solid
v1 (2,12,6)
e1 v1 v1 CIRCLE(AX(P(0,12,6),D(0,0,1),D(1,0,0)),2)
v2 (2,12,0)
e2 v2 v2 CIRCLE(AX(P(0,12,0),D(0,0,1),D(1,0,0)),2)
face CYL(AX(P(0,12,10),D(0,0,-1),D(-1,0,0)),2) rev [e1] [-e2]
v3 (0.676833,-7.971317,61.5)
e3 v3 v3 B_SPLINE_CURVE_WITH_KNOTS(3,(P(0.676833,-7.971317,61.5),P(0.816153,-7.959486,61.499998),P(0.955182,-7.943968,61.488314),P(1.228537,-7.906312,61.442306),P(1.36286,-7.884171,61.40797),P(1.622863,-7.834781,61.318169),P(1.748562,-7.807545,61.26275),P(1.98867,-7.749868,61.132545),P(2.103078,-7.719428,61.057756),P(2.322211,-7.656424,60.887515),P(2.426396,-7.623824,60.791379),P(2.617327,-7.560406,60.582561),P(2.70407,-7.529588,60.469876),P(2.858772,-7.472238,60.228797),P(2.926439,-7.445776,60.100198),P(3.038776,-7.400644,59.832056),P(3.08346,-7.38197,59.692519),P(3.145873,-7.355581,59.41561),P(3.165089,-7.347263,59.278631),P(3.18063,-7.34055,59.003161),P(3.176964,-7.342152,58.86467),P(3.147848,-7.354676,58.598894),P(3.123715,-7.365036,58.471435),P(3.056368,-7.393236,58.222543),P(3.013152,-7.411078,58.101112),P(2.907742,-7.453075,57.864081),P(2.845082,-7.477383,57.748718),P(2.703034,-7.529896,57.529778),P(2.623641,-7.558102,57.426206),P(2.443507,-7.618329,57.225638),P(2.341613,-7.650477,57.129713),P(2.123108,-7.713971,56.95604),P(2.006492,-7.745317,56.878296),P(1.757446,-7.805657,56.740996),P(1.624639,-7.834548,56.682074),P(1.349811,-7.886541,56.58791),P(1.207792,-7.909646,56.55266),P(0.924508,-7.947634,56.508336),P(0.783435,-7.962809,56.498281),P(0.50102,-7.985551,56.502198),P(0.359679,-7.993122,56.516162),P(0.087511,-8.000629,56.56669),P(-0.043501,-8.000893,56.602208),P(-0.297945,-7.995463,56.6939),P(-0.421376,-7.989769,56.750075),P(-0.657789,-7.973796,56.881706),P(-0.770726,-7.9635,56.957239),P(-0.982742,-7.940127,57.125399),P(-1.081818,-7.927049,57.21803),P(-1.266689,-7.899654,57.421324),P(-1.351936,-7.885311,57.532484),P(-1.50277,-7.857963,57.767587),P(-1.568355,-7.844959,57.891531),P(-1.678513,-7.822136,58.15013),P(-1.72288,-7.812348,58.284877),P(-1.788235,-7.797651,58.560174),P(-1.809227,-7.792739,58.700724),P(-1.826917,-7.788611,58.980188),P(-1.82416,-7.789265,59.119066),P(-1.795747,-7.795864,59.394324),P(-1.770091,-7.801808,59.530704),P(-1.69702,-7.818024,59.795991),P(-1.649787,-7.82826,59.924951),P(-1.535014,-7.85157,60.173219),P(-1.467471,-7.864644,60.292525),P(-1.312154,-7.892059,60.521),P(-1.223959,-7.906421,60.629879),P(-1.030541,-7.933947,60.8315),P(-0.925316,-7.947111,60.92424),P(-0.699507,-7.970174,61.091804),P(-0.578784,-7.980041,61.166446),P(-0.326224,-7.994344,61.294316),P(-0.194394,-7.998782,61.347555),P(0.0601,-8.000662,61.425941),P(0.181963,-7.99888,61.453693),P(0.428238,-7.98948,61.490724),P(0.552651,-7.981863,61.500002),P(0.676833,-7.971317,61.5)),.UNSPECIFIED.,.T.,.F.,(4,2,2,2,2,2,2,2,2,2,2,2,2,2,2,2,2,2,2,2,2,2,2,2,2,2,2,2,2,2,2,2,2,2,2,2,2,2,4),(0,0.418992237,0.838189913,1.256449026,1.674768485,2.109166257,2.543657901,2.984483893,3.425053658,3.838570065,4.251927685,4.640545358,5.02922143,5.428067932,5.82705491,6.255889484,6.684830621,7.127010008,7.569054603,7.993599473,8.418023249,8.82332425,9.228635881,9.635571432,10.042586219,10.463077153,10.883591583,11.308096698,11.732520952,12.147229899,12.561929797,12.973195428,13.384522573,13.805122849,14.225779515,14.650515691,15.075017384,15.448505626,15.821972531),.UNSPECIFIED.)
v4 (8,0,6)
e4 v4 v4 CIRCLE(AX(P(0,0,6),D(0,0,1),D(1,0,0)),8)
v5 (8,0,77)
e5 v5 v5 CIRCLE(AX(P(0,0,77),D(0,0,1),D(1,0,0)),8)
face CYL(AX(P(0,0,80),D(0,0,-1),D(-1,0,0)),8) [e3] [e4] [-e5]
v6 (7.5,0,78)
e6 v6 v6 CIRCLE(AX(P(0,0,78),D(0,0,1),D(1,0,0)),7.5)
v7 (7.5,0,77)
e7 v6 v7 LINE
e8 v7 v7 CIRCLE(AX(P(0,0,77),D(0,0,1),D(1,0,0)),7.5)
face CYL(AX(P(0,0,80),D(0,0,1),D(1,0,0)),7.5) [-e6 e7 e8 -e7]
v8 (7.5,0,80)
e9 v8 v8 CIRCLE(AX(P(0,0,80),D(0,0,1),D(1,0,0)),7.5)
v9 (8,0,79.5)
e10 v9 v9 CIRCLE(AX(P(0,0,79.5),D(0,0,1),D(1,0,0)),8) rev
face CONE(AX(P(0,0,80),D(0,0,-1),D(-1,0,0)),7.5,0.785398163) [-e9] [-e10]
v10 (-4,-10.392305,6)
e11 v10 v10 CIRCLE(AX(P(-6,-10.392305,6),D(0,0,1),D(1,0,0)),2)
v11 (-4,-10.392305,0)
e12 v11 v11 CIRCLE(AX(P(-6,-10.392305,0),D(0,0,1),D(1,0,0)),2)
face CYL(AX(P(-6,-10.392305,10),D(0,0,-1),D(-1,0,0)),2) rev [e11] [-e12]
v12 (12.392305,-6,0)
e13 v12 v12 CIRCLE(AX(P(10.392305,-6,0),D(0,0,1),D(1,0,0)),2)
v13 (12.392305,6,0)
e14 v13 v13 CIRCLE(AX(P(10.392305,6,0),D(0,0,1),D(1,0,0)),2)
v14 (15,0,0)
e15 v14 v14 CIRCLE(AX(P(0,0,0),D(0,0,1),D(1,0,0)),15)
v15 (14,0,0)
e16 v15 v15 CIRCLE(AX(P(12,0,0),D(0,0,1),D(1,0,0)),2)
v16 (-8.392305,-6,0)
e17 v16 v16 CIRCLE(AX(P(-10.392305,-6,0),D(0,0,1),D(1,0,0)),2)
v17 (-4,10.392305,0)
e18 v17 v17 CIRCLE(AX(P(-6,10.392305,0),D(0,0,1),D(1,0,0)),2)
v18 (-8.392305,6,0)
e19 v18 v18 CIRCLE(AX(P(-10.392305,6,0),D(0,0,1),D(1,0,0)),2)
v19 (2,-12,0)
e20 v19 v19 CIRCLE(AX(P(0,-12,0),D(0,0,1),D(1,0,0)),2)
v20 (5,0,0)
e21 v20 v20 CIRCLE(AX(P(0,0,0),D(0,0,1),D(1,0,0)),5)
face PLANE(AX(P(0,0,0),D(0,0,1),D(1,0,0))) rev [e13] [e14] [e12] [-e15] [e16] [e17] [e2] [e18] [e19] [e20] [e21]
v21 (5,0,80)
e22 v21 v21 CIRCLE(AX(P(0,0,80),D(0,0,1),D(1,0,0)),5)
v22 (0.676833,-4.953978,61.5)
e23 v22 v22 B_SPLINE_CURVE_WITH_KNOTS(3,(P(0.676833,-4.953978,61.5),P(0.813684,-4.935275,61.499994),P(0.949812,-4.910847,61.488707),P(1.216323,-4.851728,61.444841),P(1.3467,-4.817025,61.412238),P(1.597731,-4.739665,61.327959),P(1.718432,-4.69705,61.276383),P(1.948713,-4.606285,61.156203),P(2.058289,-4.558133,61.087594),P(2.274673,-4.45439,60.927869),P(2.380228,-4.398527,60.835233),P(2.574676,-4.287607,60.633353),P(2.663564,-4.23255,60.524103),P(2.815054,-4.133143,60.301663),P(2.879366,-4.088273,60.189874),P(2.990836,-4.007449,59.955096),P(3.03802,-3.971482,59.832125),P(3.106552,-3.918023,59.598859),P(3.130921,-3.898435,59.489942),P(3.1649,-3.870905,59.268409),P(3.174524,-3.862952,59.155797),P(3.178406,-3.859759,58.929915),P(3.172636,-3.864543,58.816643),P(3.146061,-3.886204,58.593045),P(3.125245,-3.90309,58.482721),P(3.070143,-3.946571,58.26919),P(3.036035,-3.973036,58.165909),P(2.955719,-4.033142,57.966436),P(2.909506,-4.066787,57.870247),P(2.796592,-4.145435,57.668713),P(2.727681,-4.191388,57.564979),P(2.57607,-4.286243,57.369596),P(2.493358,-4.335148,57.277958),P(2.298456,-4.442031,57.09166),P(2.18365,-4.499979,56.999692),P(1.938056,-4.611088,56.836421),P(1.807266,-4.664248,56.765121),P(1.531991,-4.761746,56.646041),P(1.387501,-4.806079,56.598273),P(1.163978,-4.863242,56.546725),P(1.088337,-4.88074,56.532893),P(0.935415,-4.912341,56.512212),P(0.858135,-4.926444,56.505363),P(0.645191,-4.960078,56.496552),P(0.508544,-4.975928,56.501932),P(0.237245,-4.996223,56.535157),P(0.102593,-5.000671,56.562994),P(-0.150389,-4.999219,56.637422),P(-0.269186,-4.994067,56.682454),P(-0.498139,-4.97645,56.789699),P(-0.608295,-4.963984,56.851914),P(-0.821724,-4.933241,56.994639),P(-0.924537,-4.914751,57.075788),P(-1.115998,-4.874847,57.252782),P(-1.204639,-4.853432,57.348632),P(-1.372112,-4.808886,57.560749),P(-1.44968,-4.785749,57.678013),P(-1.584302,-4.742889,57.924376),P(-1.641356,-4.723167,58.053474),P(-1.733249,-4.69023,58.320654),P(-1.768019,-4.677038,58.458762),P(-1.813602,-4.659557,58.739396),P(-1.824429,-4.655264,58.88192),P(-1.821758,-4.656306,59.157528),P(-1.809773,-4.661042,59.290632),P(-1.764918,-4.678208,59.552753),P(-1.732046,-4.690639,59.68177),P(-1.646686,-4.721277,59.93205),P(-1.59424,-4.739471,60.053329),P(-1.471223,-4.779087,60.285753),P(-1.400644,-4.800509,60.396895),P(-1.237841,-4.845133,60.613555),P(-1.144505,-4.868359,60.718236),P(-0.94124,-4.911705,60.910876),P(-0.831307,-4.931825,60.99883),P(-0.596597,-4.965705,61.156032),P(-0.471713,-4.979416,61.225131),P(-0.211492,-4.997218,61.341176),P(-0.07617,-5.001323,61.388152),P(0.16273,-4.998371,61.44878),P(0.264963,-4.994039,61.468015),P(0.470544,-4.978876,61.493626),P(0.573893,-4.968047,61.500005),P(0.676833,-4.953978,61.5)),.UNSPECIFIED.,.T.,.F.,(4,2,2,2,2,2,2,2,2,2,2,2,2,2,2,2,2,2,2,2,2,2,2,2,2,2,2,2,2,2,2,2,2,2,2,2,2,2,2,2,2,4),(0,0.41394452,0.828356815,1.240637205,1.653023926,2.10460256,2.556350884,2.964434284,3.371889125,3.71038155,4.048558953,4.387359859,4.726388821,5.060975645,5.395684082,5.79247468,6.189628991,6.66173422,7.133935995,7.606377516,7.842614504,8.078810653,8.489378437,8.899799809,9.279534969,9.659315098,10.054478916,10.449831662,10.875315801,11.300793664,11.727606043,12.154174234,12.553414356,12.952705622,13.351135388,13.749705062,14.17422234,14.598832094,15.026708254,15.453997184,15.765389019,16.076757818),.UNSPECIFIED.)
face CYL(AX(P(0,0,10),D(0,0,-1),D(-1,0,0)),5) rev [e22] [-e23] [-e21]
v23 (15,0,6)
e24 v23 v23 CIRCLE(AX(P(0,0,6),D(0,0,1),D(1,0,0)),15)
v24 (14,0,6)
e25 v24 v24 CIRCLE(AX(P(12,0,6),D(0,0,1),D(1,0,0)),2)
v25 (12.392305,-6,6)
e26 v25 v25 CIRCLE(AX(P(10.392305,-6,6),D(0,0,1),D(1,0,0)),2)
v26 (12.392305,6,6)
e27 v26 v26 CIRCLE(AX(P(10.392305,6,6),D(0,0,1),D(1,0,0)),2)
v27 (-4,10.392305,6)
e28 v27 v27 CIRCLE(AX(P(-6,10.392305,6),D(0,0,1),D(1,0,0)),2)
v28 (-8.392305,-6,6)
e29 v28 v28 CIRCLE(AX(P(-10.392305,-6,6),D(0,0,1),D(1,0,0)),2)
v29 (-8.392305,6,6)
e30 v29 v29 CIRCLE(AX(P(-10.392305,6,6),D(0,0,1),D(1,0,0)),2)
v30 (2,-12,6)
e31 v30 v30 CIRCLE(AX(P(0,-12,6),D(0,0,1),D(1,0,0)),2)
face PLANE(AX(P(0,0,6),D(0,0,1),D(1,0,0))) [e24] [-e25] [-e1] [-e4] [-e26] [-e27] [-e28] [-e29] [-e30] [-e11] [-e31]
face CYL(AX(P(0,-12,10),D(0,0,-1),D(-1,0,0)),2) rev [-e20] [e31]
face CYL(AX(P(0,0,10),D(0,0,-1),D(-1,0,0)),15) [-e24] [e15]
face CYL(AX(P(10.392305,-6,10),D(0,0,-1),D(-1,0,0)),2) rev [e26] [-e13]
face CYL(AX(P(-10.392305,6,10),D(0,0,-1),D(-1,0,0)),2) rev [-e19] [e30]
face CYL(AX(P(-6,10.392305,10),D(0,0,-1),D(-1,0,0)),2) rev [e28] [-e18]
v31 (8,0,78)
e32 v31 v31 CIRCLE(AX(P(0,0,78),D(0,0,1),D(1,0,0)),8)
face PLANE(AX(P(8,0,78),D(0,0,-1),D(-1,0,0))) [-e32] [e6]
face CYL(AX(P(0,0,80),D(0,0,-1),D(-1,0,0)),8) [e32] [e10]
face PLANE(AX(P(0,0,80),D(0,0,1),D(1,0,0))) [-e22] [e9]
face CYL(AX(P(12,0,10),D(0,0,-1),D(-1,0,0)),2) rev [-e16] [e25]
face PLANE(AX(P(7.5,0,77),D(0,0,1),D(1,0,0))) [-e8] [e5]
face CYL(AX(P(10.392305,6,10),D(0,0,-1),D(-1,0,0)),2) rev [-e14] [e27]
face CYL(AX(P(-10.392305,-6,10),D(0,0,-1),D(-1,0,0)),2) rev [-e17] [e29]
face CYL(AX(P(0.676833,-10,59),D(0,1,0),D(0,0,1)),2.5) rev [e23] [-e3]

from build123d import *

# Parameters (mm, degrees)
SKETCH_1_R          = 15
SKETCH_1_R_2        = 2
SKETCH_1_R_3        = 5
EXTRUDE_1_DEPTH     = 10
SKETCH_2_R          = 8
SKETCH_2_R_2        = 5
EXTRUDE_2_DEPTH     = 70
SKETCH_3_R          = 2.5
CUT_EXTRUDE_1_DEPTH = 10
CUT_EXTRUDE_START   = -4
SKETCH_4_R          = 18.074037985
SKETCH_4_R_2        = 8
CUT_EXTRUDE_2_DEPTH = 4
CHAMFER_1_SIZE      = 0.5
SKETCH_5_W          = 0.5
SKETCH_5_H          = 1


with BuildPart() as part:
    # 草图1 → 凸台-拉伸1 (new body)
    with BuildSketch(Plane.XY):
        Circle(SKETCH_1_R)
        with Locations((0, 12)):
            Circle(SKETCH_1_R_2, mode=Mode.SUBTRACT)
        with Locations((10.392304845, 6)):
            Circle(SKETCH_1_R_2, mode=Mode.SUBTRACT)
        with Locations((10.392304845, -6)):
            Circle(SKETCH_1_R_2, mode=Mode.SUBTRACT)
        with Locations((0, -12)):
            Circle(SKETCH_1_R_2, mode=Mode.SUBTRACT)
        with Locations((-10.392304845, -6)):
            Circle(SKETCH_1_R_2, mode=Mode.SUBTRACT)
        with Locations((-10.392304845, 6)):
            Circle(SKETCH_1_R_2, mode=Mode.SUBTRACT)
        with Locations((-6, 10.392304845)):
            Circle(SKETCH_1_R_2, mode=Mode.SUBTRACT)
        with Locations((12, 0)):
            Circle(SKETCH_1_R_2, mode=Mode.SUBTRACT)
        with Locations((-6, -10.392304845)):
            Circle(SKETCH_1_R_2, mode=Mode.SUBTRACT)
        Circle(SKETCH_1_R_3, mode=Mode.SUBTRACT)
    extrude(amount=EXTRUDE_1_DEPTH)

    # 草图2 → 凸台-拉伸2 (add)
    with BuildSketch(Plane.XY.offset(10)):
        Circle(SKETCH_2_R)
        Circle(SKETCH_2_R_2, mode=Mode.SUBTRACT)
    extrude(amount=EXTRUDE_2_DEPTH)

    # 草图3 → 切除-拉伸1 (cut)
    with BuildSketch(Plane(origin=(0, 0, 0), x_dir=(1, 0, 0), z_dir=(0, 1, 0))):
        with Locations((0.676832819, -59)):
            Circle(SKETCH_3_R)
    extrude(amount=-CUT_EXTRUDE_1_DEPTH, mode=Mode.SUBTRACT)

    # 草图4 → 切除-拉伸2 (cut)
    with BuildSketch(Plane.XY.offset(10).offset(CUT_EXTRUDE_START)):
        Circle(SKETCH_4_R)
        Circle(SKETCH_4_R_2, mode=Mode.SUBTRACT)
    extrude(amount=CUT_EXTRUDE_2_DEPTH, mode=Mode.SUBTRACT)

    # Chamfer 1
    chamfer_1_edges = [part.edges().sort_by_distance(p)[0] for p in [
        (-8, 0, 80),
    ]]
    chamfer(chamfer_1_edges, length=CHAMFER_1_SIZE)

    # 切除-扫描2: sweep along a path in 草图6
    with BuildLine(Plane.XY.offset(80)) as sweep_2_path:
        CenterArc((0, 0), 7.5, 0, 360)
    # 草图5 → 切除-扫描2 (sweep, cut)
    with BuildSketch(Plane(origin=(0, 0, 0), x_dir=(1, 0, 0), z_dir=(0, 1, 0))):
        with Locations((7.75, -77.5)):
            Rectangle(SKETCH_5_W, SKETCH_5_H)
    sweep(path=sweep_2_path.line, mode=Mode.SUBTRACT)


solid = part.part
